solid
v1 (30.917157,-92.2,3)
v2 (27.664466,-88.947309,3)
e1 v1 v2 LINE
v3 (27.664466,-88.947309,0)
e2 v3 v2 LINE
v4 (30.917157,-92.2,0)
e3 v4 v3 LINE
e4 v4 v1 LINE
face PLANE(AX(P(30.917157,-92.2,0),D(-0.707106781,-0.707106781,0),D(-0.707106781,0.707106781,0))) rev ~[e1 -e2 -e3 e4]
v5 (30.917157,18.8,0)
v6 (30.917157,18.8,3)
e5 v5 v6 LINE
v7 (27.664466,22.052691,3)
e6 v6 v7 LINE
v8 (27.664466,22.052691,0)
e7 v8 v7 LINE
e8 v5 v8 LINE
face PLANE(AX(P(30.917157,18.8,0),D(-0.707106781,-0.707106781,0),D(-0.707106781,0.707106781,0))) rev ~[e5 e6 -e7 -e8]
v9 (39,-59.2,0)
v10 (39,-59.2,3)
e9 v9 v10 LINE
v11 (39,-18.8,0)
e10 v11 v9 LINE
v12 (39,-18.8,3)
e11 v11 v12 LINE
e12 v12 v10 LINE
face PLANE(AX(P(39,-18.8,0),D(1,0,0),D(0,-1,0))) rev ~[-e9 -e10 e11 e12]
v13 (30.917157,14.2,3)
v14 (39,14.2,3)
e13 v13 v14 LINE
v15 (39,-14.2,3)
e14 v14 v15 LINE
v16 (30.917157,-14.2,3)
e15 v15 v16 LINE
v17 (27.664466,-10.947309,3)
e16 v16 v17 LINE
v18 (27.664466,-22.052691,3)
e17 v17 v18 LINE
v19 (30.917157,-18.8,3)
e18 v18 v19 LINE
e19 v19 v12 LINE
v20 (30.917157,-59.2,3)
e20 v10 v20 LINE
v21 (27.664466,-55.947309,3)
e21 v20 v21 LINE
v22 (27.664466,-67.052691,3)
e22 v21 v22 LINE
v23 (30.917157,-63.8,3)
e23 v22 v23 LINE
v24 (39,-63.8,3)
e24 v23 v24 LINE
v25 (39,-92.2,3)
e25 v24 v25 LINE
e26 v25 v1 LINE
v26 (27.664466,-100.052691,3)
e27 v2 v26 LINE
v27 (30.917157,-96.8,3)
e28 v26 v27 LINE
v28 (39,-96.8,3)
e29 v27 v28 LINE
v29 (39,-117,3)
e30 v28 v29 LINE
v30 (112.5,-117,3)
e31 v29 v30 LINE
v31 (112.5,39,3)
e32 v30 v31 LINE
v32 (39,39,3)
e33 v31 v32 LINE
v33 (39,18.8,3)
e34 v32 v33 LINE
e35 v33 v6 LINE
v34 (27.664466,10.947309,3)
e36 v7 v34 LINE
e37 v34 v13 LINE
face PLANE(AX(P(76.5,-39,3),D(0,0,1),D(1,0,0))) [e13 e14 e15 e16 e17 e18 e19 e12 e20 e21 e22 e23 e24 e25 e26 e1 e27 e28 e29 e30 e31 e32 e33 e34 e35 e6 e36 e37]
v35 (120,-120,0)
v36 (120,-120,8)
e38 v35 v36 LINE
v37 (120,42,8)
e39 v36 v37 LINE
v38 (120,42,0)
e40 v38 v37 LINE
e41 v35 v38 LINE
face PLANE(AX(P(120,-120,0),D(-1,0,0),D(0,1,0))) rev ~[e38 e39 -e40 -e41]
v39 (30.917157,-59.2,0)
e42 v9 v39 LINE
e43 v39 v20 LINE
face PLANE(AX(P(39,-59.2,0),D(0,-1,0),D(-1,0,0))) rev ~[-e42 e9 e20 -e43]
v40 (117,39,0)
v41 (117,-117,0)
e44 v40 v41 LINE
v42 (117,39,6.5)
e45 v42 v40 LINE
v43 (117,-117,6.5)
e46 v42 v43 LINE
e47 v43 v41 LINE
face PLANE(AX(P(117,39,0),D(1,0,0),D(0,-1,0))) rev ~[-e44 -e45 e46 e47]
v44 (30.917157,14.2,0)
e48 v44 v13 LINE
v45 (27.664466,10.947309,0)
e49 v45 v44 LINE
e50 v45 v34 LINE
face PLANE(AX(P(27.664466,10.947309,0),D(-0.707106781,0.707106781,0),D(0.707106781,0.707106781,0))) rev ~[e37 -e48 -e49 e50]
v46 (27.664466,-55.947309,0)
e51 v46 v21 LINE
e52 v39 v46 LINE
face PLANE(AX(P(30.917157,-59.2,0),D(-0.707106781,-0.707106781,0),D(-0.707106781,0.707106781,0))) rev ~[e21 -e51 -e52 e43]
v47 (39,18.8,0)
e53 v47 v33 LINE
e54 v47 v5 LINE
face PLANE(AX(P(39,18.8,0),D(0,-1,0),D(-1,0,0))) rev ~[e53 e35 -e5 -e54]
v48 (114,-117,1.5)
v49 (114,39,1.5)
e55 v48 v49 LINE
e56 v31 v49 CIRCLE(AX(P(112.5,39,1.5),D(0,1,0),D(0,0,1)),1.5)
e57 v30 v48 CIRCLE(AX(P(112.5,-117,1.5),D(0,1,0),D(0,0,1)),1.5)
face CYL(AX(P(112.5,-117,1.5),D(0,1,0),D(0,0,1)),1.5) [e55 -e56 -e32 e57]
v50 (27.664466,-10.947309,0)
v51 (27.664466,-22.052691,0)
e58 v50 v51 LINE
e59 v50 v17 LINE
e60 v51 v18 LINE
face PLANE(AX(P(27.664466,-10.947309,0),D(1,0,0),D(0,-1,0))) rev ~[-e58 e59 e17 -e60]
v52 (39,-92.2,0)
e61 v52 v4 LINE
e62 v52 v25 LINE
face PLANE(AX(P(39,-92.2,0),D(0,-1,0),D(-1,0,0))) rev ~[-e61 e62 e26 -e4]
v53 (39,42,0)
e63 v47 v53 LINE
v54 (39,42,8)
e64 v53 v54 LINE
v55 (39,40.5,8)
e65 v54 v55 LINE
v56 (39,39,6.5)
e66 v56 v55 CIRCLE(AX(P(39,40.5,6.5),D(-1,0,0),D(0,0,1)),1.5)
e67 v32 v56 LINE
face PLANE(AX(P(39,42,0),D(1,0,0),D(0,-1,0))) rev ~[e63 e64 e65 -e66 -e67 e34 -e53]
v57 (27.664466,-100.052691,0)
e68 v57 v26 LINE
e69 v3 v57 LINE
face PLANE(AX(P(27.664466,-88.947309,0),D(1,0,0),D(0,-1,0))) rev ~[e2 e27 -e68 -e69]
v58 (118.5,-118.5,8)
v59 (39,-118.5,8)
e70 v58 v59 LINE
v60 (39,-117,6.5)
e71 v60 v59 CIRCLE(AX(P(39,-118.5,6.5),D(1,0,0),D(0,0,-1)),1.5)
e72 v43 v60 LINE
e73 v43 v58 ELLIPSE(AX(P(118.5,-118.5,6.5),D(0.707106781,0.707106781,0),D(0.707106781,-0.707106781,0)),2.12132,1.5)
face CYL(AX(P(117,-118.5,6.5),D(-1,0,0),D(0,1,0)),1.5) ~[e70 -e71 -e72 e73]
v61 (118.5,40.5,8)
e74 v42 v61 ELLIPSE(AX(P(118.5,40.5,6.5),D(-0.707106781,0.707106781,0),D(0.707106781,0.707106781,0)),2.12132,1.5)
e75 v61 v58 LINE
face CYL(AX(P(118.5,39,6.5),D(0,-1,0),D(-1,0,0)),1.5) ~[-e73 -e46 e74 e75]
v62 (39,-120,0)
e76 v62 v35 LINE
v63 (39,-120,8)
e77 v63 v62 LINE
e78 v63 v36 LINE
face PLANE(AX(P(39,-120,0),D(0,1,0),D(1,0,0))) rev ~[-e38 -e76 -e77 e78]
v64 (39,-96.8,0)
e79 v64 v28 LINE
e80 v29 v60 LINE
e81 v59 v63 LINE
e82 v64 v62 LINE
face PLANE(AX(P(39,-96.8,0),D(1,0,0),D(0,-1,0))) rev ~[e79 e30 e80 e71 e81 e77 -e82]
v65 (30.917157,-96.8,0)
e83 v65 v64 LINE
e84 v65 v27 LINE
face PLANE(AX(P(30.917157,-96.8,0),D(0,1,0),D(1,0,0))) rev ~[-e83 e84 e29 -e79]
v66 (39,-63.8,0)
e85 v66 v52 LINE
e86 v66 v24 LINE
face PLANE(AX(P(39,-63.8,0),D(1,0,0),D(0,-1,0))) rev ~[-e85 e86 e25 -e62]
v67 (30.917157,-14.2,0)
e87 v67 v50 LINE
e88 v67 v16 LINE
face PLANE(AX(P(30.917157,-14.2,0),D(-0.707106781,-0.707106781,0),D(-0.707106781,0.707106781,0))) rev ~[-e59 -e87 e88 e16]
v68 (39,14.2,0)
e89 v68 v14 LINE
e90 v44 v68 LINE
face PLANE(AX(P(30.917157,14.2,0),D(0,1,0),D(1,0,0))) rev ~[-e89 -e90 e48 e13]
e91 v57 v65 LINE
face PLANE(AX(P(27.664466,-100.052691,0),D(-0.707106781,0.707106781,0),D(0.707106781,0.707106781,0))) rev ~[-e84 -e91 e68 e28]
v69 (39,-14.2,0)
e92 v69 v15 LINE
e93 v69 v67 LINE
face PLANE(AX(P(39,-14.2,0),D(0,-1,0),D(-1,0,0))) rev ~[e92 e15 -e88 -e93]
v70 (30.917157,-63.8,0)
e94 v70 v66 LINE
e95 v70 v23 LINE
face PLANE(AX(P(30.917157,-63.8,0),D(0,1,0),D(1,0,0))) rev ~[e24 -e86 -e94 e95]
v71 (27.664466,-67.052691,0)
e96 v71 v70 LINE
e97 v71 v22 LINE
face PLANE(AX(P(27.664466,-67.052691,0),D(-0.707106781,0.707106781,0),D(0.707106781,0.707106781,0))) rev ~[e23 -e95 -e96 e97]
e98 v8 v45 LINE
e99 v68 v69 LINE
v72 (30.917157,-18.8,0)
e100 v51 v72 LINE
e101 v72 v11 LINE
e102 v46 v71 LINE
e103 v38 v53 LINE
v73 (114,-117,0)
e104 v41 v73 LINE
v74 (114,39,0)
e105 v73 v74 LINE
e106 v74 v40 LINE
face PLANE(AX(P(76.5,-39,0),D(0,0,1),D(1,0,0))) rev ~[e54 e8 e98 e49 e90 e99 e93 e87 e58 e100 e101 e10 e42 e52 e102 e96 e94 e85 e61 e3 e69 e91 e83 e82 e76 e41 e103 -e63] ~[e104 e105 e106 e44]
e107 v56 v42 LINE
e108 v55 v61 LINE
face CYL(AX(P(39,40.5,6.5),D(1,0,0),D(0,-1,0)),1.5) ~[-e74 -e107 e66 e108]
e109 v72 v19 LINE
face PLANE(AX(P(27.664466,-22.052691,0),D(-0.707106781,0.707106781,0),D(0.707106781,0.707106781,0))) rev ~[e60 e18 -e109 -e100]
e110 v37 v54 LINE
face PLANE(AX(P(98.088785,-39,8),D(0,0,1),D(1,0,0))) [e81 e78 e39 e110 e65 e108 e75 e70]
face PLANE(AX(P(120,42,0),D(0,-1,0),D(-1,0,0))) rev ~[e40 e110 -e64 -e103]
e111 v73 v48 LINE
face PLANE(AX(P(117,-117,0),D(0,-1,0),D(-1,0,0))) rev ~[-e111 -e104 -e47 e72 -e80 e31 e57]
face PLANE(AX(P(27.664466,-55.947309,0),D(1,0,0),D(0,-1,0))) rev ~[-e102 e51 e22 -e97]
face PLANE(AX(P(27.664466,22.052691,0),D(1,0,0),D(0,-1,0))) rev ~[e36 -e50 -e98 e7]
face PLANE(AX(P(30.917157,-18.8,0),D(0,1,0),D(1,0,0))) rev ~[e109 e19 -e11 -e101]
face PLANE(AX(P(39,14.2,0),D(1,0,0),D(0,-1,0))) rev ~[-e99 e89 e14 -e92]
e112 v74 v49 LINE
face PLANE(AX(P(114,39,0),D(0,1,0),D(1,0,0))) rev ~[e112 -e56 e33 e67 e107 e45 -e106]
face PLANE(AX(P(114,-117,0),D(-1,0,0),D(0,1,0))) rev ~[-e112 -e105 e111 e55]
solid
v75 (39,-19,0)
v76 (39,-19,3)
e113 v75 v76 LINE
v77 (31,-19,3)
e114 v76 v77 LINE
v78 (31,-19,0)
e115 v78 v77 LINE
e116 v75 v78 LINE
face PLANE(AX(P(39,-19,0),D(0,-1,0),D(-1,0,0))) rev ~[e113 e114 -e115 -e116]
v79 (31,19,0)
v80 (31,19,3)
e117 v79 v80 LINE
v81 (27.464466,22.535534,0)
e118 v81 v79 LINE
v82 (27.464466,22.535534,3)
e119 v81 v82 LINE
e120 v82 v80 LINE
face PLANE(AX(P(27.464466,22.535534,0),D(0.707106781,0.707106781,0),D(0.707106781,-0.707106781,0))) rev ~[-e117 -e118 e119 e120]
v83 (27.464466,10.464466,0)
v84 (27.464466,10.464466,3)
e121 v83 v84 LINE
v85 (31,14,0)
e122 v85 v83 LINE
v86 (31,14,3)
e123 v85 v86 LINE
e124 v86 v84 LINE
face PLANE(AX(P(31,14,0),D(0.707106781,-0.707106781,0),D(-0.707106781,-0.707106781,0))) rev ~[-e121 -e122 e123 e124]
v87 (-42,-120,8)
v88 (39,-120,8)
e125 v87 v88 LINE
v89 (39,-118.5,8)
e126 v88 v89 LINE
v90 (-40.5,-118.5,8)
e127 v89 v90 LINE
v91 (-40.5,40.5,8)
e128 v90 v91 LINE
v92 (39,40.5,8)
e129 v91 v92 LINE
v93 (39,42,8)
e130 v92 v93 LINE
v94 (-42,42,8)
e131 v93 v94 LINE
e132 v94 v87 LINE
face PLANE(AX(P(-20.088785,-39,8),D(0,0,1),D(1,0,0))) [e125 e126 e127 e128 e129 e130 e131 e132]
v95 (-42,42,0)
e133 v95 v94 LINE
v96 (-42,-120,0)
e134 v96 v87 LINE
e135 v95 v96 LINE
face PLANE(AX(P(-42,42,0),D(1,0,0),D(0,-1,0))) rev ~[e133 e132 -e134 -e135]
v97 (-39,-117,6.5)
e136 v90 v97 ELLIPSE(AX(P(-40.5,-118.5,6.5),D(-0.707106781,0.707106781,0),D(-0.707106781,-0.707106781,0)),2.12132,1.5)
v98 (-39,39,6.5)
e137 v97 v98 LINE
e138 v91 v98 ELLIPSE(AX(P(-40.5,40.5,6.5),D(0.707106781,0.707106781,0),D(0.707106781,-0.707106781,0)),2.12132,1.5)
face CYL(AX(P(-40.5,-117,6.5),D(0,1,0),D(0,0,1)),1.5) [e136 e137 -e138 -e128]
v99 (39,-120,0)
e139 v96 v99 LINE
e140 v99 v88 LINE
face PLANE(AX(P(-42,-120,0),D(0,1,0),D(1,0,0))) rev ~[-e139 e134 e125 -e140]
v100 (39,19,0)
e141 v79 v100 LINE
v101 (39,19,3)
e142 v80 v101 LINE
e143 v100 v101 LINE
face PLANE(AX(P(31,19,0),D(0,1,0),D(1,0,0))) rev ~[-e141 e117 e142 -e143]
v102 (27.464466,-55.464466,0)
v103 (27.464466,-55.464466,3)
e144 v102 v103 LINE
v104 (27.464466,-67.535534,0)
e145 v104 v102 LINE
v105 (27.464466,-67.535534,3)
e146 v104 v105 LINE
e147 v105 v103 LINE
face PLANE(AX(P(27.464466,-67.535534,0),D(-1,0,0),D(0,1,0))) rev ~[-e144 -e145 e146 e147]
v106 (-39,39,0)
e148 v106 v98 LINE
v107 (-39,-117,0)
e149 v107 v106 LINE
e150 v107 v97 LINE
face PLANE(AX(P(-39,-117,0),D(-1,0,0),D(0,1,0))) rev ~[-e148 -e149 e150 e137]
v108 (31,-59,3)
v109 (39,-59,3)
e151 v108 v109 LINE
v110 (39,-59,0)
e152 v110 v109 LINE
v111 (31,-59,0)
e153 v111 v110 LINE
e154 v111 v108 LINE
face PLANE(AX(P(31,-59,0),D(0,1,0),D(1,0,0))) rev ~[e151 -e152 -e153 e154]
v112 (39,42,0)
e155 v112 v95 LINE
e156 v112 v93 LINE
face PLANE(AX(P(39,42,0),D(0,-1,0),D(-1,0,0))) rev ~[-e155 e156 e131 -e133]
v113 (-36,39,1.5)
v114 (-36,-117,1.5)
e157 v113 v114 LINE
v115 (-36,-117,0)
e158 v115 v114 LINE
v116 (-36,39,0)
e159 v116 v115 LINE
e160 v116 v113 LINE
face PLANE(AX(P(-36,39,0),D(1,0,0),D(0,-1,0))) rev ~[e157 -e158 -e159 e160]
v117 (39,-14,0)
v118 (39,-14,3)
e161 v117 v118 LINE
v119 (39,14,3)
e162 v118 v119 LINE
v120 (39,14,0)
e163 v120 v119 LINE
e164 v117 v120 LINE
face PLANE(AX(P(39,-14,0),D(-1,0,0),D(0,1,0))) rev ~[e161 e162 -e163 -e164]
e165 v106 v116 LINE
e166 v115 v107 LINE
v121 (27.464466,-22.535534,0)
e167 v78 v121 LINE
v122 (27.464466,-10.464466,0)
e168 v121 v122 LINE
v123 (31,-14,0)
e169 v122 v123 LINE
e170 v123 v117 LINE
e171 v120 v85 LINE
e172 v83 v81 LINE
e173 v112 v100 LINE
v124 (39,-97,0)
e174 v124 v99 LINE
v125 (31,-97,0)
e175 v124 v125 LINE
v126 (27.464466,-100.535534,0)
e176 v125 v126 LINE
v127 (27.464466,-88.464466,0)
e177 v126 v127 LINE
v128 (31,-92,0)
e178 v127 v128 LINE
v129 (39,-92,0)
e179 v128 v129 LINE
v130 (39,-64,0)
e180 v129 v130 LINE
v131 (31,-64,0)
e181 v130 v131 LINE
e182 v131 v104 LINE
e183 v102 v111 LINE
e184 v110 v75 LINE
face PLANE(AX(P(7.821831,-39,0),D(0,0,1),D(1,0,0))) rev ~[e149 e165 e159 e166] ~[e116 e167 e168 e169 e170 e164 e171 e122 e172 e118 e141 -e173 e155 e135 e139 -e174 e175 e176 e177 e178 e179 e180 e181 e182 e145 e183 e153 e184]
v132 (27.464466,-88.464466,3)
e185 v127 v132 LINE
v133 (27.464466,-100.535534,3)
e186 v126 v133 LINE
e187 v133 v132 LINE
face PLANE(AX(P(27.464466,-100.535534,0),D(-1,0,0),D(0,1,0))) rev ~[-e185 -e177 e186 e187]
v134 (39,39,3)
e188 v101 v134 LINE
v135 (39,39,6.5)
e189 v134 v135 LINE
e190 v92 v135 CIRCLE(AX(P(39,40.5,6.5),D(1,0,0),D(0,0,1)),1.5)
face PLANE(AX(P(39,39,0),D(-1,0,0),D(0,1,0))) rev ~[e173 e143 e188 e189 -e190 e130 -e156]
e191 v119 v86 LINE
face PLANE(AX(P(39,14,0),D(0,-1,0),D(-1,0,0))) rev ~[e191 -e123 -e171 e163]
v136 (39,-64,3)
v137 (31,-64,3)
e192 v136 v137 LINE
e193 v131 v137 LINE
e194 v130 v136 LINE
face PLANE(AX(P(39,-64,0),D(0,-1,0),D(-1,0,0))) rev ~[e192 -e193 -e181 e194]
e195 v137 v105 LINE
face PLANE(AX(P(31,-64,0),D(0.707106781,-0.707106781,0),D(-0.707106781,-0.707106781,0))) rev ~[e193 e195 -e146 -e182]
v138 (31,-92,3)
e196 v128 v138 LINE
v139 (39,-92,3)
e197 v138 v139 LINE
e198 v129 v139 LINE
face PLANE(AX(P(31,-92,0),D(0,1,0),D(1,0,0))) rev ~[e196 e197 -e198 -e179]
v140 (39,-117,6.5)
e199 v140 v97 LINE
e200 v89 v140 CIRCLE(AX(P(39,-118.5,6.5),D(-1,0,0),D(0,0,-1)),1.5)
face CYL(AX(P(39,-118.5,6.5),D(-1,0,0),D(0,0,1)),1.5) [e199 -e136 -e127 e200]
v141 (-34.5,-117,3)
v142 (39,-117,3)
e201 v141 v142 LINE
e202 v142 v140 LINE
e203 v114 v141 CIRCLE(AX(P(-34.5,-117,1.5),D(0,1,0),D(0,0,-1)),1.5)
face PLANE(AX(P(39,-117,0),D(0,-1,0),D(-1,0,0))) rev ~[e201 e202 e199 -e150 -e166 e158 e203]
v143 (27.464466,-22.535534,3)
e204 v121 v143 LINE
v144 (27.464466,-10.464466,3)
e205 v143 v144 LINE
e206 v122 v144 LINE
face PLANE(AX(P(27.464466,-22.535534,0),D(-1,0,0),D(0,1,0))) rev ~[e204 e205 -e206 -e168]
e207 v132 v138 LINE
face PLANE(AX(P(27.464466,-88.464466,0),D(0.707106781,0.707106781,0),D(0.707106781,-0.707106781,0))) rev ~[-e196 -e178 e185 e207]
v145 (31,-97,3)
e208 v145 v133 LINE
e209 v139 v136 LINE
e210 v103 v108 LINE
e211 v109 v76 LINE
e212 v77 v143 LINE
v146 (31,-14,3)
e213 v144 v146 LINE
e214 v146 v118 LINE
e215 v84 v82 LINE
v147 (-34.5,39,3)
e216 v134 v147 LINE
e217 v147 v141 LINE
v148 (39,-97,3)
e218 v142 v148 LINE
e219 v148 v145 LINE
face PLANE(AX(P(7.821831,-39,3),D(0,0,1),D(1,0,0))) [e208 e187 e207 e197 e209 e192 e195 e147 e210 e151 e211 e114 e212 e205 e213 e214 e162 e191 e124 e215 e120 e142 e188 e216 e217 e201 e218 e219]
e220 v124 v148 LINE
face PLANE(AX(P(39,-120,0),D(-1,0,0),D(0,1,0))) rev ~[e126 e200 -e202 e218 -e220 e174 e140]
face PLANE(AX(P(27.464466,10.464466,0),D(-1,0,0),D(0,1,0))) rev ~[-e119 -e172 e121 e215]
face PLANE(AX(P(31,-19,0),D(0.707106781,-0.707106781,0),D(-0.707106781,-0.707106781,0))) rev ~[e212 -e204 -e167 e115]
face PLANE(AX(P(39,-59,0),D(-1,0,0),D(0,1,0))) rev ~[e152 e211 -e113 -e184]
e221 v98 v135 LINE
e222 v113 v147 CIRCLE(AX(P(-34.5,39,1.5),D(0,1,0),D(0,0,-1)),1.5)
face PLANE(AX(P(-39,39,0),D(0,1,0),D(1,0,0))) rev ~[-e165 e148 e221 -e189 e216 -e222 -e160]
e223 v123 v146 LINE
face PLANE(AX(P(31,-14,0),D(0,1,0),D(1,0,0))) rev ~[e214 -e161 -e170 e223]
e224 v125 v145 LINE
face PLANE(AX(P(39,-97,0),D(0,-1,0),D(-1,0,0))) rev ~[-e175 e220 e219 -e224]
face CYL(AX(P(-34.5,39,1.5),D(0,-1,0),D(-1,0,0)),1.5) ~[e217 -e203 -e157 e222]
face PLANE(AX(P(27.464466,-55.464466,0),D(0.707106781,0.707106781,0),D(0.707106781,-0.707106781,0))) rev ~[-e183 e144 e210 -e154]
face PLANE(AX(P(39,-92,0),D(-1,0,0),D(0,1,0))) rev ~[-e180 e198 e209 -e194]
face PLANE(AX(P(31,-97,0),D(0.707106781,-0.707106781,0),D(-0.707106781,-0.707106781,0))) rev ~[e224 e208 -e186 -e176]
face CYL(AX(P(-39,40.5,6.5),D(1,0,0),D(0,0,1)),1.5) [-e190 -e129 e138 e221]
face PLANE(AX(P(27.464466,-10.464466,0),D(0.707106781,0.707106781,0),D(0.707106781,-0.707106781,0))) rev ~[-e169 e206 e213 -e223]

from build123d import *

# Parameters (mm, degrees)
F1_DEPTH = 8
F2_DEPTH = 3
F3_DEPTH = 3
F4_DEPTH = 8
F5_R     = 1.5
F5_2_R   = 1.5


with BuildPart() as f1:
    # F0 (on Top) → F1 (new body)
    with BuildSketch(Plane.XY):
        Polygon((-39, -39), (-39, 39), (-36, 39), (39, 39), (39, 42), (-42, 42), (-42, -39), (-42, -120), (39, -120), (39, -117), (-36, -117), (-39, -117), align=None)
    extrude(amount=F1_DEPTH)

    # F0 (on Top) → F2 (join)
    with BuildSketch(Plane.XY):
        Polygon((39, 39), (-36, 39), (-36, -117), (39, -117), (39, -97), (31, -97), (27.4644660941, -100.5355339059), (27.4644660941, -88.4644660941), (31, -92), (39, -92), (39, -64), (31, -64), (27.4644660941, -67.5355339059), (27.4644660941, -55.4644660941), (31, -59), (39, -59), (39, -19), (31, -19), (27.4644660941, -22.5355339059), (27.4644660941, -10.4644660941), (31, -14), (39, -14), (39, 14), (31, 14), (27.4644660941, 10.4644660941), (27.4644660941, 22.5355339059), (31, 19), (39, 19), align=None)
    extrude(amount=F2_DEPTH)

    # F5
    f5_edges = [f1.edges().sort_by_distance(p)[0] for p in [
        (0, 39, 8),
        (0, -117, 8),
        (-39, -39, 8),
        (-36, -39, 3),
    ]]
    fillet(f5_edges, radius=F5_R)


with BuildPart() as f3:
    # F0 (on Top) → F3 (new body)
    with BuildSketch(Plane.XY):
        Polygon((114, 39), (39, 39), (39, 19), (39, 18.8), (39, 14.2), (39, 14), (39, -14), (39, -14.2), (39, -18.8), (39, -19), (39, -59), (39, -59.2), (39, -63.8), (39, -64), (39, -92), (39, -92.2), (39, -96.8), (39, -97), (39, -117), (114, -117), align=None)
        Polygon((39, 42), (39, 39), (114, 39), (117, 39), (117, -39), (117, -117), (114, -117), (39, -117), (39, -120), (120, -120), (120, -39), (120, 42), align=None)
        Polygon((30.9171572875, -96.8), (39, -96.8), (39, -92.2), (30.9171572875, -92.2), (27.6644660941, -88.9473088065), (27.6644660941, -100.0526911935), align=None)
        Polygon((30.9171572875, -63.8), (39, -63.8), (39, -59.2), (30.9171572875, -59.2), (27.6644660941, -55.9473088065), (27.6644660941, -67.0526911935), align=None)
        Polygon((39, -18.8), (39, -14.2), (30.9171572875, -14.2), (27.6644660941, -10.9473088065), (27.6644660941, -22.0526911935), (30.9171572875, -18.8), align=None)
        Polygon((39, 14.2), (39, 18.8), (30.9171572875, 18.8), (27.6644660941, 22.0526911935), (27.6644660941, 10.9473088065), (30.9171572875, 14.2), align=None)
    extrude(amount=F3_DEPTH)

    # F0 (on Top) → F4 (join)
    with BuildSketch(Plane.XY):
        Polygon((39, 42), (39, 39), (114, 39), (117, 39), (117, -39), (117, -117), (114, -117), (39, -117), (39, -120), (120, -120), (120, -39), (120, 42), align=None)
    extrude(amount=F4_DEPTH)

    # F5#2
    f5_2_edges = [f3.edges().sort_by_distance(p)[0] for p in [
        (78, 39, 8),
        (117, -39, 8),
        (78, -117, 8),
        (114, -39, 3),
    ]]
    fillet(f5_2_edges, radius=F5_2_R)


solid = Compound([f1.part, f3.part])
